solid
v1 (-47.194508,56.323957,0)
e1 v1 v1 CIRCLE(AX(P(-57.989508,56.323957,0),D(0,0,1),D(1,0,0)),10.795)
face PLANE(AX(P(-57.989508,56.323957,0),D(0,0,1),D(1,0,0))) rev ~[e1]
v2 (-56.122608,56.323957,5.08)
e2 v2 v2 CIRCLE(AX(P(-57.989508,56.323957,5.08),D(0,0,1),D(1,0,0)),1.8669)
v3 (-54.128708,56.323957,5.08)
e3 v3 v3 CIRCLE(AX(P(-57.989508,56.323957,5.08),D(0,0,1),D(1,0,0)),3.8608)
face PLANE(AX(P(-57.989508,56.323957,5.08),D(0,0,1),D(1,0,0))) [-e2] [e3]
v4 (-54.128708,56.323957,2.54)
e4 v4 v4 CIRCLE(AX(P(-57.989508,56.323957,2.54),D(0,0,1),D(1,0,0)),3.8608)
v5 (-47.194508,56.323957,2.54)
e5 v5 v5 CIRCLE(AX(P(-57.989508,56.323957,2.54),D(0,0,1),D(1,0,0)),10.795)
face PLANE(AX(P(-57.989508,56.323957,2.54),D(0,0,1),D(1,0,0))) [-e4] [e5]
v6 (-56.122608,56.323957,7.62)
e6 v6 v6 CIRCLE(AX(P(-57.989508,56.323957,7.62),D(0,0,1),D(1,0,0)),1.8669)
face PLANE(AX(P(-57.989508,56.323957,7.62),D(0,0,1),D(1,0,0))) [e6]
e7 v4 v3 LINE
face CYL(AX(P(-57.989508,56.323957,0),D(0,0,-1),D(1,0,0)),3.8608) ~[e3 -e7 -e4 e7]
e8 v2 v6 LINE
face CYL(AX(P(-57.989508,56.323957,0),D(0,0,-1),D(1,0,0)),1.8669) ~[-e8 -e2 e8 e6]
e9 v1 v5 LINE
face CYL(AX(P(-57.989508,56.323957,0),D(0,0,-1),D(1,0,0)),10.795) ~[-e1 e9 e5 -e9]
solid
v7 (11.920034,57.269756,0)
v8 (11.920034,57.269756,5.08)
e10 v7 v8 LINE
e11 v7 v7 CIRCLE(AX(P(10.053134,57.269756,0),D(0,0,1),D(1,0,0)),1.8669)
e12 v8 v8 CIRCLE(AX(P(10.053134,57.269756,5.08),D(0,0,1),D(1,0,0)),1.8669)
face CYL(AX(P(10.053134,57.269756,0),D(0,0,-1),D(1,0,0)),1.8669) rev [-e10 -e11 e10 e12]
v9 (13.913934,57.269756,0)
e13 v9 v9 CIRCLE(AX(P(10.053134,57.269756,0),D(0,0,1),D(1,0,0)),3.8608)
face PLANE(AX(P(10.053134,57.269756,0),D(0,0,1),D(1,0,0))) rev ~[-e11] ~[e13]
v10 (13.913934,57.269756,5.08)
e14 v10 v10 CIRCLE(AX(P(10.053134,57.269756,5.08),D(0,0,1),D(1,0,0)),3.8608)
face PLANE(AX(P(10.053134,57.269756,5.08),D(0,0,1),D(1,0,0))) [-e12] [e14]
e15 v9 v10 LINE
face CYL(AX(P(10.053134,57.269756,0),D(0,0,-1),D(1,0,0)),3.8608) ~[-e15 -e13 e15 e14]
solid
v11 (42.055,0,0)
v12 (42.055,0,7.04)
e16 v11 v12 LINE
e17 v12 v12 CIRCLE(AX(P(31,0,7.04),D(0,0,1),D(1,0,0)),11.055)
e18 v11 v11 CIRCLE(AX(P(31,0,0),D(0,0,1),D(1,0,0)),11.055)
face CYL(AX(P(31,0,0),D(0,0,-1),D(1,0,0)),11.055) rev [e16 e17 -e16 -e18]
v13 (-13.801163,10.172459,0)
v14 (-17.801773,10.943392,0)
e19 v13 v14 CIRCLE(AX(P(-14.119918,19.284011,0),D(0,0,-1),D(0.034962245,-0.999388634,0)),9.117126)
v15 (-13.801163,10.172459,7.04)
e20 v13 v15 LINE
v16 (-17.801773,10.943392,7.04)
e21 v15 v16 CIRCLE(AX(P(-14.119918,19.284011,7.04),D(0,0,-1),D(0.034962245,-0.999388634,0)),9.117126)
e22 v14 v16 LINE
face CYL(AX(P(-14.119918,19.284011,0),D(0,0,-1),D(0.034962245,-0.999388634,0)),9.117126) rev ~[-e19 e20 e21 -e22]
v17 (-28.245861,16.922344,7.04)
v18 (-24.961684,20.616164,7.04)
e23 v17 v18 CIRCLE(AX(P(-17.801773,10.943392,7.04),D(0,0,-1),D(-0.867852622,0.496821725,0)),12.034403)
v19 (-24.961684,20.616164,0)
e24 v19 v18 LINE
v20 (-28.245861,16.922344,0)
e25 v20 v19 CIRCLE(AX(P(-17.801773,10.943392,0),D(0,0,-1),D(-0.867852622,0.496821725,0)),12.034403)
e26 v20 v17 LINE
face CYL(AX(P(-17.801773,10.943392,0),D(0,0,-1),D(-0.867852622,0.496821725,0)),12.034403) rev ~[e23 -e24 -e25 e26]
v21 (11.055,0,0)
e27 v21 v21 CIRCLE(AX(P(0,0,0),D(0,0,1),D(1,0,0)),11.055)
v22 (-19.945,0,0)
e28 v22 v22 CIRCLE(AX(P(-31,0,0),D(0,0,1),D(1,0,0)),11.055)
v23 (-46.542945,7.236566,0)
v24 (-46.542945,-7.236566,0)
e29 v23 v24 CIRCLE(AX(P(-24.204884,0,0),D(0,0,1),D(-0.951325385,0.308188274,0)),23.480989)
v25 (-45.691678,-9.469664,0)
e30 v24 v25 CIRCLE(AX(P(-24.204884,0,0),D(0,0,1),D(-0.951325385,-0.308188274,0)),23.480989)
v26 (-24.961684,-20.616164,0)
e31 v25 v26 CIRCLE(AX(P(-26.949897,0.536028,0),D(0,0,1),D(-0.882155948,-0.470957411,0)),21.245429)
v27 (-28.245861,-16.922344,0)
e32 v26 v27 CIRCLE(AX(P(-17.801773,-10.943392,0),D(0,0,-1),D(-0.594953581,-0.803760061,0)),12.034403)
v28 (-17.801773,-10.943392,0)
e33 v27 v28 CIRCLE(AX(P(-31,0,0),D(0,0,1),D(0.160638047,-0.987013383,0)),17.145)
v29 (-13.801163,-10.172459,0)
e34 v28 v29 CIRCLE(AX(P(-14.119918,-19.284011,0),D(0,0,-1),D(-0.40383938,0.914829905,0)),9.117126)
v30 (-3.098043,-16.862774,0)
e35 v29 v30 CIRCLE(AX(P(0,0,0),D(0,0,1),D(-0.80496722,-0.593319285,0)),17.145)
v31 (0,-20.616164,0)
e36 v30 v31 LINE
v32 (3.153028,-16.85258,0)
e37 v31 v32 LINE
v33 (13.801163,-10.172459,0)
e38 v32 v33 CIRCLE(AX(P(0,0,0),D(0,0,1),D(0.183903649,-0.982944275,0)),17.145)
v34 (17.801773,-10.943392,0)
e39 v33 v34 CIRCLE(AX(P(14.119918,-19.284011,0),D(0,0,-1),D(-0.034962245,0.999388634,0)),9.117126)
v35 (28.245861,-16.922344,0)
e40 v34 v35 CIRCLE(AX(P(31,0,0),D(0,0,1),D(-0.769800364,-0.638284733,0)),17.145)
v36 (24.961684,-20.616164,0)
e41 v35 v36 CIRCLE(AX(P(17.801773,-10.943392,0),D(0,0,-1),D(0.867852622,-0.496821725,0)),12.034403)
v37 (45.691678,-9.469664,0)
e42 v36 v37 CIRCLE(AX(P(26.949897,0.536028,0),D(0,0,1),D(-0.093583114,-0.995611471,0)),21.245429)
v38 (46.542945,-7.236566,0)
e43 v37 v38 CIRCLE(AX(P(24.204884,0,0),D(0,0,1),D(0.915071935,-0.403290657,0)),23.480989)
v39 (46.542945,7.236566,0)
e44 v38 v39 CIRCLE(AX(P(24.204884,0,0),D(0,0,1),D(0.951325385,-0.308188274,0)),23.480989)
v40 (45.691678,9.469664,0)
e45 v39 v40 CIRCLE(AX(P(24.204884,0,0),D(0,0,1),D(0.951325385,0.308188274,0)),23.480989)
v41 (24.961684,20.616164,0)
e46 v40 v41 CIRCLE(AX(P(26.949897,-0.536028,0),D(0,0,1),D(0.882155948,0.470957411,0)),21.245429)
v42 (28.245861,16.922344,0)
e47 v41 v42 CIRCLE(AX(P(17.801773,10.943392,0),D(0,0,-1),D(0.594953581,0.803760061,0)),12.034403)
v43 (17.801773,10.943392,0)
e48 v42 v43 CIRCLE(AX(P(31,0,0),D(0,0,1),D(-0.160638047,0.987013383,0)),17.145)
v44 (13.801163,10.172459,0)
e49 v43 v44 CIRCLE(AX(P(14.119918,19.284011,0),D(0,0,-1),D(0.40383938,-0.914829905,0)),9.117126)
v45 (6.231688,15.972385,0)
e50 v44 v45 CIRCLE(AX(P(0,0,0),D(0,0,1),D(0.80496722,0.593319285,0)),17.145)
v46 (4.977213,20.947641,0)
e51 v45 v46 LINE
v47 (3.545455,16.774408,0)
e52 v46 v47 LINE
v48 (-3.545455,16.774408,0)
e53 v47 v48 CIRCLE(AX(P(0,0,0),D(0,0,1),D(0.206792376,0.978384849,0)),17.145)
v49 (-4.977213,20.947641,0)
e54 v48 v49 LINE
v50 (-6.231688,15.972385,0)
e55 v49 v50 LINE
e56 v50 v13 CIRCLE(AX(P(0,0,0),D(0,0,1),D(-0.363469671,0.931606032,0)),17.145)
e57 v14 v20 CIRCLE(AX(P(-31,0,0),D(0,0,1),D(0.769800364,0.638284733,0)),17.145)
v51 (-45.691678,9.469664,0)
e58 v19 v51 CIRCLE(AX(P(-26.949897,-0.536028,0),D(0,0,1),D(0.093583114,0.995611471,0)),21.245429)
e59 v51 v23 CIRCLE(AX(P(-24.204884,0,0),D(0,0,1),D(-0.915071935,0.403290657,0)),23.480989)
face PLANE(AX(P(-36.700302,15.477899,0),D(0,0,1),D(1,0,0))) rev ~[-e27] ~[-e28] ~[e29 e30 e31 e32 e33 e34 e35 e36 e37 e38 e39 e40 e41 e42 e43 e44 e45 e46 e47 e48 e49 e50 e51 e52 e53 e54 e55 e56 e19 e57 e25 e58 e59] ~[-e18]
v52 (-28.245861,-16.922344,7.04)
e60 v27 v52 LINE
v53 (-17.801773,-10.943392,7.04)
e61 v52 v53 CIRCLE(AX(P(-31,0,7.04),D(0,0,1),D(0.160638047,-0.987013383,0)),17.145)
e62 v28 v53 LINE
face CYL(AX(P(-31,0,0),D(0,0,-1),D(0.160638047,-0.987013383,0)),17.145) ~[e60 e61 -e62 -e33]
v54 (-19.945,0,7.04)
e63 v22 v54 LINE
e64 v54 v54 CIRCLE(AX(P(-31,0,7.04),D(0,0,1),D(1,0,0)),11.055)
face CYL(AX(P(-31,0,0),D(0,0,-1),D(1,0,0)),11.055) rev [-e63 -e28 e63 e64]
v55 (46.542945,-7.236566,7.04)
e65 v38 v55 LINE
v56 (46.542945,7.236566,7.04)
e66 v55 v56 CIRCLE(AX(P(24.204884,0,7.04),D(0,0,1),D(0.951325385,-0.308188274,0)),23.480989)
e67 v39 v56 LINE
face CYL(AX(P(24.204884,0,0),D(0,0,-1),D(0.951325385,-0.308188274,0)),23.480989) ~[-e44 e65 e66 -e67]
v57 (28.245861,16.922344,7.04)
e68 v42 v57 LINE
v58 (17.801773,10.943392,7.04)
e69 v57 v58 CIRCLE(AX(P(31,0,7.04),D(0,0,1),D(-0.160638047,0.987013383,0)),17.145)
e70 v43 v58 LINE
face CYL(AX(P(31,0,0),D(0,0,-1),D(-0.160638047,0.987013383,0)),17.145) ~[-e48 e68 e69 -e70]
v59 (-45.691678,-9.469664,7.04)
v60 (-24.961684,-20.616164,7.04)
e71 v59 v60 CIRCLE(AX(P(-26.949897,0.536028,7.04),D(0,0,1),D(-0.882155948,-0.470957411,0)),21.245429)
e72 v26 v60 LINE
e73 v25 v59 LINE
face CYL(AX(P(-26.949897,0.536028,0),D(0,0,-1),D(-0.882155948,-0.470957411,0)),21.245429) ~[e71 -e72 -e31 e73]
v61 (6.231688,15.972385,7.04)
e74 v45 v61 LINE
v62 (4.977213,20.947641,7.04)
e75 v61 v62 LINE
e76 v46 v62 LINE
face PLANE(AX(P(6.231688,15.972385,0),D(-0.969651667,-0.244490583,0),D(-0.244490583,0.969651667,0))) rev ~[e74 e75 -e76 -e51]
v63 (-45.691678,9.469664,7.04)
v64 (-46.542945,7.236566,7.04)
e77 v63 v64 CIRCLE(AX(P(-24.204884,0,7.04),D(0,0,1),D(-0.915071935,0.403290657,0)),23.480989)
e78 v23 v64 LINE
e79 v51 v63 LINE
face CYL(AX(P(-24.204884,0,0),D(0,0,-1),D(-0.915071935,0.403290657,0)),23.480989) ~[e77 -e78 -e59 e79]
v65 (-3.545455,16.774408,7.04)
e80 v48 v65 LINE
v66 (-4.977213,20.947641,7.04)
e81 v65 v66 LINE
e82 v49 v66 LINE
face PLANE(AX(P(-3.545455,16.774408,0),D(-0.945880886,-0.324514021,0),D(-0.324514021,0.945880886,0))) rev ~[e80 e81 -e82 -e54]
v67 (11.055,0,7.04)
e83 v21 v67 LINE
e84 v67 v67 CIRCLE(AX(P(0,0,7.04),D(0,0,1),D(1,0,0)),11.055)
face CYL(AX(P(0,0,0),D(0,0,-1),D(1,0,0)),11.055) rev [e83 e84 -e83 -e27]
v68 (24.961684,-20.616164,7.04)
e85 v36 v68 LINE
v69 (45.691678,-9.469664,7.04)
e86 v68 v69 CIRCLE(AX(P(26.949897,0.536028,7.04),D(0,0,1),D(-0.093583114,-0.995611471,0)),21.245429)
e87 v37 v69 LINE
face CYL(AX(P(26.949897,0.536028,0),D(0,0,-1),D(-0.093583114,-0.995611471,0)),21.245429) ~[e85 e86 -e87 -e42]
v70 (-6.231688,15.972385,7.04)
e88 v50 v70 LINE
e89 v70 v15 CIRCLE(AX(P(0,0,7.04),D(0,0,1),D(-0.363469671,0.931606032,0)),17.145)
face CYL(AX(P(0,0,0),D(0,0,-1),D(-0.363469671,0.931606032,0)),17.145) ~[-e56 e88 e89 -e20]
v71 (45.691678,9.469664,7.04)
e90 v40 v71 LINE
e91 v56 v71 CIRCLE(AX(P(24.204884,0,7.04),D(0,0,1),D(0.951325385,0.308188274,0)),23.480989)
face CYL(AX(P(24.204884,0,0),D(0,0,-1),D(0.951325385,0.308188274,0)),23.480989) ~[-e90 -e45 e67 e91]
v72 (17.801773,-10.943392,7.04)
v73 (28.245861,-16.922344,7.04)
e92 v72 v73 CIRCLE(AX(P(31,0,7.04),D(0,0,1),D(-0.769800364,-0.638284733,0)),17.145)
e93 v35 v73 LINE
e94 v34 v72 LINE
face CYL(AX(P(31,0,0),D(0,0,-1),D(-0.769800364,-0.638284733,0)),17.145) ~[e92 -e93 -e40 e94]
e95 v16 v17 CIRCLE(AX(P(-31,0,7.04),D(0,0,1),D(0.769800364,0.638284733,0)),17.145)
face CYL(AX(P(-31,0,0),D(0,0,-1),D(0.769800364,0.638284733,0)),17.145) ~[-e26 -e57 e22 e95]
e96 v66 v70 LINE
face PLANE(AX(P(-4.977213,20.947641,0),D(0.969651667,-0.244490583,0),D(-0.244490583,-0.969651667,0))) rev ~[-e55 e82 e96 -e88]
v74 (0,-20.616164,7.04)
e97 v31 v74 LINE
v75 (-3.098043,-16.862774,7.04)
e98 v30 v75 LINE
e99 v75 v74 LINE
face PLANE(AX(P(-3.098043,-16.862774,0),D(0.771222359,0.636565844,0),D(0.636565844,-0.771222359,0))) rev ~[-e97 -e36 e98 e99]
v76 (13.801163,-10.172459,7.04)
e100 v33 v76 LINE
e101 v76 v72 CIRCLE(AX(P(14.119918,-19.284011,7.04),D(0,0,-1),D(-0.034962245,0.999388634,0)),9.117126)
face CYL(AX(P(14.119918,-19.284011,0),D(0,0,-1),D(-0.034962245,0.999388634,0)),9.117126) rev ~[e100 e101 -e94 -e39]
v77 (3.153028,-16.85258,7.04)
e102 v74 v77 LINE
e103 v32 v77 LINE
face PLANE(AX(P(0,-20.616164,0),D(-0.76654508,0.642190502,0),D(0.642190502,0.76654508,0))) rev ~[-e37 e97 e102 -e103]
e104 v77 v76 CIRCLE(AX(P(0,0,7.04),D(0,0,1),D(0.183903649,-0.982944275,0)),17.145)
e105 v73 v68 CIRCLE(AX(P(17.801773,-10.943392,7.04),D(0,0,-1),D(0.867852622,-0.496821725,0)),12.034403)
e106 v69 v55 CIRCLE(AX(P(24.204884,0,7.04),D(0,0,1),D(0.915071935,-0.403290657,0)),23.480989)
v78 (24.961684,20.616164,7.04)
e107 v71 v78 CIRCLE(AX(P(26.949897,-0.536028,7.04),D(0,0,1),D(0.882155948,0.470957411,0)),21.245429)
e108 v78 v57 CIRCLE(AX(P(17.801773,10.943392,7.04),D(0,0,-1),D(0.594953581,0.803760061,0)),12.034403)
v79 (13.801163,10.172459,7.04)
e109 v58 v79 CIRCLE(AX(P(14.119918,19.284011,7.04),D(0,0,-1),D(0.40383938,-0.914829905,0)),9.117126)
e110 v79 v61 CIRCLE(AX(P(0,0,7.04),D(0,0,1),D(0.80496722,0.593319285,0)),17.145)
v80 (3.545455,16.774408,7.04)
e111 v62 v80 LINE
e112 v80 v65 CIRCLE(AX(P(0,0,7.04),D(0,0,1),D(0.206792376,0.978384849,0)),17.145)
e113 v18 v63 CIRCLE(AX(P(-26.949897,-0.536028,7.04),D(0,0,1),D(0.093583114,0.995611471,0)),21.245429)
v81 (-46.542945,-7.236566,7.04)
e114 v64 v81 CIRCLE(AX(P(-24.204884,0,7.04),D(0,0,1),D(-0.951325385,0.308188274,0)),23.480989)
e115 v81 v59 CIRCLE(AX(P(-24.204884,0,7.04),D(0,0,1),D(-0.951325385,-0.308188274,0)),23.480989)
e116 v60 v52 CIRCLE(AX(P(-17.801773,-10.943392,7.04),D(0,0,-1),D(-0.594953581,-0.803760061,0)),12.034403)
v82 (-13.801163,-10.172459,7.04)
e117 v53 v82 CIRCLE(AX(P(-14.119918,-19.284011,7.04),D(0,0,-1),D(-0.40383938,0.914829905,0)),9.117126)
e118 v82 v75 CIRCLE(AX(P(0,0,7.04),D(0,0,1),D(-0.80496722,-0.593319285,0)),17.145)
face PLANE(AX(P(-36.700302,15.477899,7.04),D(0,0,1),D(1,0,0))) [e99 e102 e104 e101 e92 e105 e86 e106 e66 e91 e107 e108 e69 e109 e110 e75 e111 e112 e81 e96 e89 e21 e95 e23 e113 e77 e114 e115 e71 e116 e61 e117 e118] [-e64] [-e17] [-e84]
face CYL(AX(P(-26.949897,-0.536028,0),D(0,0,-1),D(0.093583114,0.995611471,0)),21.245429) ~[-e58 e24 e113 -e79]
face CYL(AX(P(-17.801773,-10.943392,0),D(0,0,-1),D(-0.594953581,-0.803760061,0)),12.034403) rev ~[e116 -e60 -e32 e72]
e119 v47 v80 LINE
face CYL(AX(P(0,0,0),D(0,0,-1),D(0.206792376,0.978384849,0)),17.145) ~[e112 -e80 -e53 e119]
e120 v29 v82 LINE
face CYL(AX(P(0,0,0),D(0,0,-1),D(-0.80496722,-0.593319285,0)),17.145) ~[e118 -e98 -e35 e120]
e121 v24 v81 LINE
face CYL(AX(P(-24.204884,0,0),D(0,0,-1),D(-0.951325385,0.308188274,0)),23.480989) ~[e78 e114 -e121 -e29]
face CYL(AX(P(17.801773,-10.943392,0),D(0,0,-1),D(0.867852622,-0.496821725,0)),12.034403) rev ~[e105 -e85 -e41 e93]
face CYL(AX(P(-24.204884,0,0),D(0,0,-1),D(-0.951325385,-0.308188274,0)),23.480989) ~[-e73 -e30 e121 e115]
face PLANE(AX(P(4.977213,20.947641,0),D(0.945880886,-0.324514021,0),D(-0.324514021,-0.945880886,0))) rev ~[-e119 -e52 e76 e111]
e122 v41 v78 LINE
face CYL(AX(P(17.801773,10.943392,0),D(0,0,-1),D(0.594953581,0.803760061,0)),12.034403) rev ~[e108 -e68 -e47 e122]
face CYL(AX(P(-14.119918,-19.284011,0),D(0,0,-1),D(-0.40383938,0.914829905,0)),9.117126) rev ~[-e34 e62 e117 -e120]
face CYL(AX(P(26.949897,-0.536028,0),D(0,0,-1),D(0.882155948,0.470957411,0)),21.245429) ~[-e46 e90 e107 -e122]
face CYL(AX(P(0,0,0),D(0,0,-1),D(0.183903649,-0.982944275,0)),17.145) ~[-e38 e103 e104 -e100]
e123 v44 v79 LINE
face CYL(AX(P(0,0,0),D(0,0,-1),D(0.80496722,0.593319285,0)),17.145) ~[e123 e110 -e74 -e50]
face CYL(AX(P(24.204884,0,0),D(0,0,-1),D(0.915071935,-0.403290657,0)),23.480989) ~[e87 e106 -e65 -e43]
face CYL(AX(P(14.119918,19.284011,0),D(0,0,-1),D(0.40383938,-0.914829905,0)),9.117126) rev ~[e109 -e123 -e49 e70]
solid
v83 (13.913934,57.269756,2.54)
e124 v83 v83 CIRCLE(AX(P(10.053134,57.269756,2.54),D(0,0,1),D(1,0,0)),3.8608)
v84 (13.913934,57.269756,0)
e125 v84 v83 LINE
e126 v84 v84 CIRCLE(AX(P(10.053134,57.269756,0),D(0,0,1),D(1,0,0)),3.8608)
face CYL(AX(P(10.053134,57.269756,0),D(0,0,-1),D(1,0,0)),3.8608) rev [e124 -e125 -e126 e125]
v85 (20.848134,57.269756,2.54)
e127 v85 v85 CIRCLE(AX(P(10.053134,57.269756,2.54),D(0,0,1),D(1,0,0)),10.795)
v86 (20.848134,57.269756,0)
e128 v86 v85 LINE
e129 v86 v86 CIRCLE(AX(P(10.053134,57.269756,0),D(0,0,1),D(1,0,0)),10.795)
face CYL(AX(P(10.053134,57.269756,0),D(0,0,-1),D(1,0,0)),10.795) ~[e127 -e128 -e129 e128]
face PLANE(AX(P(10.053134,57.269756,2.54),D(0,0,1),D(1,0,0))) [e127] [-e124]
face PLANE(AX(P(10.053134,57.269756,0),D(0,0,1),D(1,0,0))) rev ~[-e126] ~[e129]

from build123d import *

# Parameters (mm, degrees)
F0_R     = 11.055
F1_DEPTH = 7.04
F2_R     = 3.8608
F2_R_2   = 1.8669
F3_DEPTH = 5.08
F2_R_3   = 10.795
F4_DEPTH = 2.54
F5_DEPTH = 7.62


with BuildPart() as f1:
    # F0 (on Top) → F1 (new body)
    with BuildSketch(Plane.XY):
        with BuildLine():
            ThreePointArc((-46.5429451347, 7.2365655902), (-39.0213444379, 15.1528564439), (-28.2458606842, 16.9223444484))
            ThreePointArc((-28.2458606842, 16.9223444484), (-26.7954522093, 18.9396770038), (-24.9616837395, 20.6161639804))
            ThreePointArc((-24.9616837395, 20.6161639804), (-37.0112899435, 18.1759091976), (-45.6916782608, 9.4696636386))
            ThreePointArc((-45.6916782608, 9.4696636386), (-46.1457401666, 8.3639516727), (-46.5429451347, 7.2365655902))
        make_face()
        with BuildLine():
            ThreePointArc((-28.2458606842, -16.9223444484), (-39.0213444379, -15.1528564439), (-46.5429451347, -7.2365655902))
            ThreePointArc((-46.5429451347, -7.2365655902), (-46.1457401666, -8.3639516727), (-45.6916782608, -9.4696636386))
            ThreePointArc((-45.6916782608, -9.4696636386), (-37.0112899435, -18.1759091976), (-24.9616837395, -20.6161639804))
            ThreePointArc((-24.9616837395, -20.6161639804), (-26.7954522093, -18.9396770038), (-28.2458606842, -16.9223444484))
        make_face()
        with BuildLine():
            ThreePointArc((-13.8011629931, 10.1724591441), (-15.8450830005, 10.3315929693), (-17.8017727644, 10.9433917429))
            ThreePointArc((-17.8017727644, 10.9433917429), (-16.5374743475, 9.2079518218), (-15.5, 7.3280983208))
            ThreePointArc((-15.5, 7.3280983208), (-14.7194475205, 8.7914099944), (-13.8011629931, 10.1724591441))
        make_face()
        with BuildLine():
            ThreePointArc((-13.855, 0), (-14.27130422, 3.7552313511), (-15.5, 7.3280983208))
            ThreePointArc((-15.5, 7.3280983208), (-17.145, 0), (-15.5, -7.3280983208))
            ThreePointArc((-15.5, -7.3280983208), (-14.27130422, -3.7552313511), (-13.855, 0))
        make_face()
        with BuildLine():
            ThreePointArc((-13.8011629931, -10.1724591441), (-14.7194475205, -8.7914099944), (-15.5, -7.3280983208))
            ThreePointArc((-15.5, -7.3280983208), (-16.5374743475, -9.2079518218), (-17.8017727644, -10.9433917429))
            ThreePointArc((-17.8017727644, -10.9433917429), (-15.8450830005, -10.3315929693), (-13.8011629931, -10.1724591441))
        make_face()
        with BuildLine():
            ThreePointArc((-13.8011629931, 10.1724591441), (-14.7194475205, 8.7914099944), (-15.5, 7.3280983208))
            ThreePointArc((-15.5, 7.3280983208), (-14.27130422, 3.7552313511), (-13.855, 0))
            ThreePointArc((-13.855, 0), (-14.27130422, -3.7552313511), (-15.5, -7.3280983208))
            ThreePointArc((-15.5, -7.3280983208), (-14.7194475205, -8.7914099944), (-13.8011629931, -10.1724591441))
            ThreePointArc((-13.8011629931, -10.1724591441), (-9.0876766021, -14.5384029032), (-3.0980425219, -16.862774313))
            ThreePointArc((-3.0980425219, -16.862774313), (0.0279613173, -17.1449771993), (3.1530280548, -16.8525795974))
            ThreePointArc((3.1530280548, -16.8525795974), (9.1113748051, -14.5235627227), (13.8011629931, -10.1724591441))
            ThreePointArc((13.8011629931, -10.1724591441), (14.7194475205, -8.7914099944), (15.5, -7.3280983208))
            ThreePointArc((15.5, -7.3280983208), (13.855, 0), (15.5, 7.3280983208))
            ThreePointArc((15.5, 7.3280983208), (14.7194475205, 8.7914099944), (13.8011629931, 10.1724591441))
            ThreePointArc((13.8011629931, 10.1724591441), (10.4277783329, 13.609278601), (6.2316875055, 15.9723854146))
            ThreePointArc((6.2316875055, 15.9723854146), (4.9049913789, 16.4283926351), (3.5454552824, 16.7744082411))
            ThreePointArc((3.5454552824, 16.7744082411), (0, 17.145), (-3.5454552824, 16.7744082411))
            ThreePointArc((-3.5454552824, 16.7744082411), (-4.9049913789, 16.4283926351), (-6.2316875055, 15.9723854146))
            ThreePointArc((-6.2316875055, 15.9723854146), (-10.4277783329, 13.609278601), (-13.8011629931, 10.1724591441))
        make_face()
        Circle(F0_R, mode=Mode.SUBTRACT)
        with BuildLine():
            Line((-4.9772132188, 20.9476407617), (-6.2316875055, 15.9723854146))
            ThreePointArc((-6.2316875055, 15.9723854146), (-4.9049913789, 16.4283926351), (-3.5454552824, 16.7744082411))
            Line((-3.5454552824, 16.7744082411), (-4.9772132188, 20.9476407617))
        make_face()
        with BuildLine():
            Line((4.9772132188, 20.9476407617), (3.5454552824, 16.7744082411))
            ThreePointArc((3.5454552824, 16.7744082411), (4.9049913789, 16.4283926351), (6.2316875055, 15.9723854146))
            Line((6.2316875055, 15.9723854146), (4.9772132188, 20.9476407617))
        make_face()
        with BuildLine():
            ThreePointArc((3.1530280548, -16.8525795974), (0.0279613173, -17.1449771993), (-3.0980425219, -16.862774313))
            Line((-3.0980425219, -16.862774313), (0, -20.6161639804))
            Line((0, -20.6161639804), (3.1530280548, -16.8525795974))
        make_face()
        with BuildLine():
            ThreePointArc((15.5, 7.3280983208), (13.855, 0), (15.5, -7.3280983208))
            ThreePointArc((15.5, -7.3280983208), (16.72869578, -3.7552313511), (17.145, 0))
            ThreePointArc((17.145, 0), (16.72869578, 3.7552313511), (15.5, 7.3280983208))
        make_face()
        with BuildLine():
            ThreePointArc((17.8017727644, 10.9433917429), (15.8450830005, 10.3315929693), (13.8011629931, 10.1724591441))
            ThreePointArc((13.8011629931, 10.1724591441), (14.7194475205, 8.7914099944), (15.5, 7.3280983208))
            ThreePointArc((15.5, 7.3280983208), (16.5374743475, 9.2079518218), (17.8017727644, 10.9433917429))
        make_face()
        with BuildLine():
            ThreePointArc((15.5, -7.3280983208), (14.7194475205, -8.7914099944), (13.8011629931, -10.1724591441))
            ThreePointArc((13.8011629931, -10.1724591441), (15.8450830005, -10.3315929693), (17.8017727644, -10.9433917429))
            ThreePointArc((17.8017727644, -10.9433917429), (16.5374743475, -9.2079518218), (15.5, -7.3280983208))
        make_face()
        with BuildLine():
            ThreePointArc((17.145, 0), (16.72869578, -3.7552313511), (15.5, -7.3280983208))
            ThreePointArc((15.5, -7.3280983208), (16.5374743475, -9.2079518218), (17.8017727644, -10.9433917429))
            ThreePointArc((17.8017727644, -10.9433917429), (22.4819915173, -14.8793332004), (28.2458606842, -16.9223444484))
            ThreePointArc((28.2458606842, -16.9223444484), (39.0213444379, -15.1528564439), (46.5429451347, -7.2365655902))
            ThreePointArc((46.5429451347, -7.2365655902), (47.6858732568, 0), (46.5429451347, 7.2365655902))
            ThreePointArc((46.5429451347, 7.2365655902), (39.0213444379, 15.1528564439), (28.2458606842, 16.9223444484))
            ThreePointArc((28.2458606842, 16.9223444484), (22.4819915173, 14.8793332004), (17.8017727644, 10.9433917429))
            ThreePointArc((17.8017727644, 10.9433917429), (16.5374743475, 9.2079518218), (15.5, 7.3280983208))
            ThreePointArc((15.5, 7.3280983208), (16.72869578, 3.7552313511), (17.145, 0))
        make_face()
        with Locations((31, 0)):
            Circle(F0_R, mode=Mode.SUBTRACT)
        with BuildLine():
            ThreePointArc((24.9616837395, 20.6161639804), (26.7954522093, 18.9396770038), (28.2458606842, 16.9223444484))
            ThreePointArc((28.2458606842, 16.9223444484), (39.0213444379, 15.1528564439), (46.5429451347, 7.2365655902))
            ThreePointArc((46.5429451347, 7.2365655902), (46.1457401666, 8.3639516727), (45.6916782608, 9.4696636386))
            ThreePointArc((45.6916782608, 9.4696636386), (37.0112899435, 18.1759091976), (24.9616837395, 20.6161639804))
        make_face()
        with BuildLine():
            ThreePointArc((46.5429451347, -7.2365655902), (39.0213444379, -15.1528564439), (28.2458606842, -16.9223444484))
            ThreePointArc((28.2458606842, -16.9223444484), (26.7954522093, -18.9396770038), (24.9616837395, -20.6161639804))
            ThreePointArc((24.9616837395, -20.6161639804), (37.0112899435, -18.1759091976), (45.6916782608, -9.4696636386))
            ThreePointArc((45.6916782608, -9.4696636386), (46.1457401666, -8.3639516727), (46.5429451347, -7.2365655902))
        make_face()
        with BuildLine():
            ThreePointArc((-15.5, 7.3280983208), (-16.5374743475, 9.2079518218), (-17.8017727644, 10.9433917429))
            ThreePointArc((-17.8017727644, 10.9433917429), (-22.4819915173, 14.8793332004), (-28.2458606842, 16.9223444484))
            ThreePointArc((-28.2458606842, 16.9223444484), (-39.0213444379, 15.1528564439), (-46.5429451347, 7.2365655902))
            ThreePointArc((-46.5429451347, 7.2365655902), (-47.6858732568, 0), (-46.5429451347, -7.2365655902))
            ThreePointArc((-46.5429451347, -7.2365655902), (-39.0213444379, -15.1528564439), (-28.2458606842, -16.9223444484))
            ThreePointArc((-28.2458606842, -16.9223444484), (-22.4819915173, -14.8793332004), (-17.8017727644, -10.9433917429))
            ThreePointArc((-17.8017727644, -10.9433917429), (-16.5374743475, -9.2079518218), (-15.5, -7.3280983208))
            ThreePointArc((-15.5, -7.3280983208), (-17.145, 0), (-15.5, 7.3280983208))
        make_face()
        with Locations((-31, 0)):
            Circle(F0_R, mode=Mode.SUBTRACT)
    extrude(amount=F1_DEPTH)


with BuildPart() as f3:
    # F2 (on Top) → F3 (new body)
    with BuildSketch(Plane.XY):
        with Locations((-57.9895079136, 56.3239566982)):
            Circle(F2_R)
        with Locations((-57.9895079136, 56.3239566982)):
            Circle(F2_R_2, mode=Mode.SUBTRACT)
    extrude(amount=F3_DEPTH)

    # F2 (on Top) → F4 (join)
    with BuildSketch(Plane.XY):
        with Locations((-57.9895079136, 56.3239566982)):
            Circle(F2_R_3)
        with Locations((-57.9895079136, 56.3239566982)):
            Circle(F2_R, mode=Mode.SUBTRACT)
    extrude(amount=F4_DEPTH)

    # F2 (on Top) → F5 (join)
    with BuildSketch(Plane.XY):
        with Locations((-57.9895079136, 56.3239566982)):
            Circle(F2_R_2)
    extrude(amount=F5_DEPTH)


with BuildPart() as f3b:
    # F2 (on Top) → F3, piece 2 (new body)
    with BuildSketch(Plane.XY):
        with Locations((10.053133592, 57.2697557509)):
            Circle(F2_R)
        with Locations((10.053133592, 57.2697557509)):
            Circle(F2_R_2, mode=Mode.SUBTRACT)
    extrude(amount=F3_DEPTH)


with BuildPart() as f4:
    # F2 (on Top) → F4, piece 2 (new body)
    with BuildSketch(Plane.XY):
        with Locations((10.053133592, 57.2697557509)):
            Circle(F2_R_3)
        with Locations((10.053133592, 57.2697557509)):
            Circle(F2_R, mode=Mode.SUBTRACT)
    extrude(amount=F4_DEPTH)


solid = Compound([f1.part, f3.part, f3b.part, f4.part])
